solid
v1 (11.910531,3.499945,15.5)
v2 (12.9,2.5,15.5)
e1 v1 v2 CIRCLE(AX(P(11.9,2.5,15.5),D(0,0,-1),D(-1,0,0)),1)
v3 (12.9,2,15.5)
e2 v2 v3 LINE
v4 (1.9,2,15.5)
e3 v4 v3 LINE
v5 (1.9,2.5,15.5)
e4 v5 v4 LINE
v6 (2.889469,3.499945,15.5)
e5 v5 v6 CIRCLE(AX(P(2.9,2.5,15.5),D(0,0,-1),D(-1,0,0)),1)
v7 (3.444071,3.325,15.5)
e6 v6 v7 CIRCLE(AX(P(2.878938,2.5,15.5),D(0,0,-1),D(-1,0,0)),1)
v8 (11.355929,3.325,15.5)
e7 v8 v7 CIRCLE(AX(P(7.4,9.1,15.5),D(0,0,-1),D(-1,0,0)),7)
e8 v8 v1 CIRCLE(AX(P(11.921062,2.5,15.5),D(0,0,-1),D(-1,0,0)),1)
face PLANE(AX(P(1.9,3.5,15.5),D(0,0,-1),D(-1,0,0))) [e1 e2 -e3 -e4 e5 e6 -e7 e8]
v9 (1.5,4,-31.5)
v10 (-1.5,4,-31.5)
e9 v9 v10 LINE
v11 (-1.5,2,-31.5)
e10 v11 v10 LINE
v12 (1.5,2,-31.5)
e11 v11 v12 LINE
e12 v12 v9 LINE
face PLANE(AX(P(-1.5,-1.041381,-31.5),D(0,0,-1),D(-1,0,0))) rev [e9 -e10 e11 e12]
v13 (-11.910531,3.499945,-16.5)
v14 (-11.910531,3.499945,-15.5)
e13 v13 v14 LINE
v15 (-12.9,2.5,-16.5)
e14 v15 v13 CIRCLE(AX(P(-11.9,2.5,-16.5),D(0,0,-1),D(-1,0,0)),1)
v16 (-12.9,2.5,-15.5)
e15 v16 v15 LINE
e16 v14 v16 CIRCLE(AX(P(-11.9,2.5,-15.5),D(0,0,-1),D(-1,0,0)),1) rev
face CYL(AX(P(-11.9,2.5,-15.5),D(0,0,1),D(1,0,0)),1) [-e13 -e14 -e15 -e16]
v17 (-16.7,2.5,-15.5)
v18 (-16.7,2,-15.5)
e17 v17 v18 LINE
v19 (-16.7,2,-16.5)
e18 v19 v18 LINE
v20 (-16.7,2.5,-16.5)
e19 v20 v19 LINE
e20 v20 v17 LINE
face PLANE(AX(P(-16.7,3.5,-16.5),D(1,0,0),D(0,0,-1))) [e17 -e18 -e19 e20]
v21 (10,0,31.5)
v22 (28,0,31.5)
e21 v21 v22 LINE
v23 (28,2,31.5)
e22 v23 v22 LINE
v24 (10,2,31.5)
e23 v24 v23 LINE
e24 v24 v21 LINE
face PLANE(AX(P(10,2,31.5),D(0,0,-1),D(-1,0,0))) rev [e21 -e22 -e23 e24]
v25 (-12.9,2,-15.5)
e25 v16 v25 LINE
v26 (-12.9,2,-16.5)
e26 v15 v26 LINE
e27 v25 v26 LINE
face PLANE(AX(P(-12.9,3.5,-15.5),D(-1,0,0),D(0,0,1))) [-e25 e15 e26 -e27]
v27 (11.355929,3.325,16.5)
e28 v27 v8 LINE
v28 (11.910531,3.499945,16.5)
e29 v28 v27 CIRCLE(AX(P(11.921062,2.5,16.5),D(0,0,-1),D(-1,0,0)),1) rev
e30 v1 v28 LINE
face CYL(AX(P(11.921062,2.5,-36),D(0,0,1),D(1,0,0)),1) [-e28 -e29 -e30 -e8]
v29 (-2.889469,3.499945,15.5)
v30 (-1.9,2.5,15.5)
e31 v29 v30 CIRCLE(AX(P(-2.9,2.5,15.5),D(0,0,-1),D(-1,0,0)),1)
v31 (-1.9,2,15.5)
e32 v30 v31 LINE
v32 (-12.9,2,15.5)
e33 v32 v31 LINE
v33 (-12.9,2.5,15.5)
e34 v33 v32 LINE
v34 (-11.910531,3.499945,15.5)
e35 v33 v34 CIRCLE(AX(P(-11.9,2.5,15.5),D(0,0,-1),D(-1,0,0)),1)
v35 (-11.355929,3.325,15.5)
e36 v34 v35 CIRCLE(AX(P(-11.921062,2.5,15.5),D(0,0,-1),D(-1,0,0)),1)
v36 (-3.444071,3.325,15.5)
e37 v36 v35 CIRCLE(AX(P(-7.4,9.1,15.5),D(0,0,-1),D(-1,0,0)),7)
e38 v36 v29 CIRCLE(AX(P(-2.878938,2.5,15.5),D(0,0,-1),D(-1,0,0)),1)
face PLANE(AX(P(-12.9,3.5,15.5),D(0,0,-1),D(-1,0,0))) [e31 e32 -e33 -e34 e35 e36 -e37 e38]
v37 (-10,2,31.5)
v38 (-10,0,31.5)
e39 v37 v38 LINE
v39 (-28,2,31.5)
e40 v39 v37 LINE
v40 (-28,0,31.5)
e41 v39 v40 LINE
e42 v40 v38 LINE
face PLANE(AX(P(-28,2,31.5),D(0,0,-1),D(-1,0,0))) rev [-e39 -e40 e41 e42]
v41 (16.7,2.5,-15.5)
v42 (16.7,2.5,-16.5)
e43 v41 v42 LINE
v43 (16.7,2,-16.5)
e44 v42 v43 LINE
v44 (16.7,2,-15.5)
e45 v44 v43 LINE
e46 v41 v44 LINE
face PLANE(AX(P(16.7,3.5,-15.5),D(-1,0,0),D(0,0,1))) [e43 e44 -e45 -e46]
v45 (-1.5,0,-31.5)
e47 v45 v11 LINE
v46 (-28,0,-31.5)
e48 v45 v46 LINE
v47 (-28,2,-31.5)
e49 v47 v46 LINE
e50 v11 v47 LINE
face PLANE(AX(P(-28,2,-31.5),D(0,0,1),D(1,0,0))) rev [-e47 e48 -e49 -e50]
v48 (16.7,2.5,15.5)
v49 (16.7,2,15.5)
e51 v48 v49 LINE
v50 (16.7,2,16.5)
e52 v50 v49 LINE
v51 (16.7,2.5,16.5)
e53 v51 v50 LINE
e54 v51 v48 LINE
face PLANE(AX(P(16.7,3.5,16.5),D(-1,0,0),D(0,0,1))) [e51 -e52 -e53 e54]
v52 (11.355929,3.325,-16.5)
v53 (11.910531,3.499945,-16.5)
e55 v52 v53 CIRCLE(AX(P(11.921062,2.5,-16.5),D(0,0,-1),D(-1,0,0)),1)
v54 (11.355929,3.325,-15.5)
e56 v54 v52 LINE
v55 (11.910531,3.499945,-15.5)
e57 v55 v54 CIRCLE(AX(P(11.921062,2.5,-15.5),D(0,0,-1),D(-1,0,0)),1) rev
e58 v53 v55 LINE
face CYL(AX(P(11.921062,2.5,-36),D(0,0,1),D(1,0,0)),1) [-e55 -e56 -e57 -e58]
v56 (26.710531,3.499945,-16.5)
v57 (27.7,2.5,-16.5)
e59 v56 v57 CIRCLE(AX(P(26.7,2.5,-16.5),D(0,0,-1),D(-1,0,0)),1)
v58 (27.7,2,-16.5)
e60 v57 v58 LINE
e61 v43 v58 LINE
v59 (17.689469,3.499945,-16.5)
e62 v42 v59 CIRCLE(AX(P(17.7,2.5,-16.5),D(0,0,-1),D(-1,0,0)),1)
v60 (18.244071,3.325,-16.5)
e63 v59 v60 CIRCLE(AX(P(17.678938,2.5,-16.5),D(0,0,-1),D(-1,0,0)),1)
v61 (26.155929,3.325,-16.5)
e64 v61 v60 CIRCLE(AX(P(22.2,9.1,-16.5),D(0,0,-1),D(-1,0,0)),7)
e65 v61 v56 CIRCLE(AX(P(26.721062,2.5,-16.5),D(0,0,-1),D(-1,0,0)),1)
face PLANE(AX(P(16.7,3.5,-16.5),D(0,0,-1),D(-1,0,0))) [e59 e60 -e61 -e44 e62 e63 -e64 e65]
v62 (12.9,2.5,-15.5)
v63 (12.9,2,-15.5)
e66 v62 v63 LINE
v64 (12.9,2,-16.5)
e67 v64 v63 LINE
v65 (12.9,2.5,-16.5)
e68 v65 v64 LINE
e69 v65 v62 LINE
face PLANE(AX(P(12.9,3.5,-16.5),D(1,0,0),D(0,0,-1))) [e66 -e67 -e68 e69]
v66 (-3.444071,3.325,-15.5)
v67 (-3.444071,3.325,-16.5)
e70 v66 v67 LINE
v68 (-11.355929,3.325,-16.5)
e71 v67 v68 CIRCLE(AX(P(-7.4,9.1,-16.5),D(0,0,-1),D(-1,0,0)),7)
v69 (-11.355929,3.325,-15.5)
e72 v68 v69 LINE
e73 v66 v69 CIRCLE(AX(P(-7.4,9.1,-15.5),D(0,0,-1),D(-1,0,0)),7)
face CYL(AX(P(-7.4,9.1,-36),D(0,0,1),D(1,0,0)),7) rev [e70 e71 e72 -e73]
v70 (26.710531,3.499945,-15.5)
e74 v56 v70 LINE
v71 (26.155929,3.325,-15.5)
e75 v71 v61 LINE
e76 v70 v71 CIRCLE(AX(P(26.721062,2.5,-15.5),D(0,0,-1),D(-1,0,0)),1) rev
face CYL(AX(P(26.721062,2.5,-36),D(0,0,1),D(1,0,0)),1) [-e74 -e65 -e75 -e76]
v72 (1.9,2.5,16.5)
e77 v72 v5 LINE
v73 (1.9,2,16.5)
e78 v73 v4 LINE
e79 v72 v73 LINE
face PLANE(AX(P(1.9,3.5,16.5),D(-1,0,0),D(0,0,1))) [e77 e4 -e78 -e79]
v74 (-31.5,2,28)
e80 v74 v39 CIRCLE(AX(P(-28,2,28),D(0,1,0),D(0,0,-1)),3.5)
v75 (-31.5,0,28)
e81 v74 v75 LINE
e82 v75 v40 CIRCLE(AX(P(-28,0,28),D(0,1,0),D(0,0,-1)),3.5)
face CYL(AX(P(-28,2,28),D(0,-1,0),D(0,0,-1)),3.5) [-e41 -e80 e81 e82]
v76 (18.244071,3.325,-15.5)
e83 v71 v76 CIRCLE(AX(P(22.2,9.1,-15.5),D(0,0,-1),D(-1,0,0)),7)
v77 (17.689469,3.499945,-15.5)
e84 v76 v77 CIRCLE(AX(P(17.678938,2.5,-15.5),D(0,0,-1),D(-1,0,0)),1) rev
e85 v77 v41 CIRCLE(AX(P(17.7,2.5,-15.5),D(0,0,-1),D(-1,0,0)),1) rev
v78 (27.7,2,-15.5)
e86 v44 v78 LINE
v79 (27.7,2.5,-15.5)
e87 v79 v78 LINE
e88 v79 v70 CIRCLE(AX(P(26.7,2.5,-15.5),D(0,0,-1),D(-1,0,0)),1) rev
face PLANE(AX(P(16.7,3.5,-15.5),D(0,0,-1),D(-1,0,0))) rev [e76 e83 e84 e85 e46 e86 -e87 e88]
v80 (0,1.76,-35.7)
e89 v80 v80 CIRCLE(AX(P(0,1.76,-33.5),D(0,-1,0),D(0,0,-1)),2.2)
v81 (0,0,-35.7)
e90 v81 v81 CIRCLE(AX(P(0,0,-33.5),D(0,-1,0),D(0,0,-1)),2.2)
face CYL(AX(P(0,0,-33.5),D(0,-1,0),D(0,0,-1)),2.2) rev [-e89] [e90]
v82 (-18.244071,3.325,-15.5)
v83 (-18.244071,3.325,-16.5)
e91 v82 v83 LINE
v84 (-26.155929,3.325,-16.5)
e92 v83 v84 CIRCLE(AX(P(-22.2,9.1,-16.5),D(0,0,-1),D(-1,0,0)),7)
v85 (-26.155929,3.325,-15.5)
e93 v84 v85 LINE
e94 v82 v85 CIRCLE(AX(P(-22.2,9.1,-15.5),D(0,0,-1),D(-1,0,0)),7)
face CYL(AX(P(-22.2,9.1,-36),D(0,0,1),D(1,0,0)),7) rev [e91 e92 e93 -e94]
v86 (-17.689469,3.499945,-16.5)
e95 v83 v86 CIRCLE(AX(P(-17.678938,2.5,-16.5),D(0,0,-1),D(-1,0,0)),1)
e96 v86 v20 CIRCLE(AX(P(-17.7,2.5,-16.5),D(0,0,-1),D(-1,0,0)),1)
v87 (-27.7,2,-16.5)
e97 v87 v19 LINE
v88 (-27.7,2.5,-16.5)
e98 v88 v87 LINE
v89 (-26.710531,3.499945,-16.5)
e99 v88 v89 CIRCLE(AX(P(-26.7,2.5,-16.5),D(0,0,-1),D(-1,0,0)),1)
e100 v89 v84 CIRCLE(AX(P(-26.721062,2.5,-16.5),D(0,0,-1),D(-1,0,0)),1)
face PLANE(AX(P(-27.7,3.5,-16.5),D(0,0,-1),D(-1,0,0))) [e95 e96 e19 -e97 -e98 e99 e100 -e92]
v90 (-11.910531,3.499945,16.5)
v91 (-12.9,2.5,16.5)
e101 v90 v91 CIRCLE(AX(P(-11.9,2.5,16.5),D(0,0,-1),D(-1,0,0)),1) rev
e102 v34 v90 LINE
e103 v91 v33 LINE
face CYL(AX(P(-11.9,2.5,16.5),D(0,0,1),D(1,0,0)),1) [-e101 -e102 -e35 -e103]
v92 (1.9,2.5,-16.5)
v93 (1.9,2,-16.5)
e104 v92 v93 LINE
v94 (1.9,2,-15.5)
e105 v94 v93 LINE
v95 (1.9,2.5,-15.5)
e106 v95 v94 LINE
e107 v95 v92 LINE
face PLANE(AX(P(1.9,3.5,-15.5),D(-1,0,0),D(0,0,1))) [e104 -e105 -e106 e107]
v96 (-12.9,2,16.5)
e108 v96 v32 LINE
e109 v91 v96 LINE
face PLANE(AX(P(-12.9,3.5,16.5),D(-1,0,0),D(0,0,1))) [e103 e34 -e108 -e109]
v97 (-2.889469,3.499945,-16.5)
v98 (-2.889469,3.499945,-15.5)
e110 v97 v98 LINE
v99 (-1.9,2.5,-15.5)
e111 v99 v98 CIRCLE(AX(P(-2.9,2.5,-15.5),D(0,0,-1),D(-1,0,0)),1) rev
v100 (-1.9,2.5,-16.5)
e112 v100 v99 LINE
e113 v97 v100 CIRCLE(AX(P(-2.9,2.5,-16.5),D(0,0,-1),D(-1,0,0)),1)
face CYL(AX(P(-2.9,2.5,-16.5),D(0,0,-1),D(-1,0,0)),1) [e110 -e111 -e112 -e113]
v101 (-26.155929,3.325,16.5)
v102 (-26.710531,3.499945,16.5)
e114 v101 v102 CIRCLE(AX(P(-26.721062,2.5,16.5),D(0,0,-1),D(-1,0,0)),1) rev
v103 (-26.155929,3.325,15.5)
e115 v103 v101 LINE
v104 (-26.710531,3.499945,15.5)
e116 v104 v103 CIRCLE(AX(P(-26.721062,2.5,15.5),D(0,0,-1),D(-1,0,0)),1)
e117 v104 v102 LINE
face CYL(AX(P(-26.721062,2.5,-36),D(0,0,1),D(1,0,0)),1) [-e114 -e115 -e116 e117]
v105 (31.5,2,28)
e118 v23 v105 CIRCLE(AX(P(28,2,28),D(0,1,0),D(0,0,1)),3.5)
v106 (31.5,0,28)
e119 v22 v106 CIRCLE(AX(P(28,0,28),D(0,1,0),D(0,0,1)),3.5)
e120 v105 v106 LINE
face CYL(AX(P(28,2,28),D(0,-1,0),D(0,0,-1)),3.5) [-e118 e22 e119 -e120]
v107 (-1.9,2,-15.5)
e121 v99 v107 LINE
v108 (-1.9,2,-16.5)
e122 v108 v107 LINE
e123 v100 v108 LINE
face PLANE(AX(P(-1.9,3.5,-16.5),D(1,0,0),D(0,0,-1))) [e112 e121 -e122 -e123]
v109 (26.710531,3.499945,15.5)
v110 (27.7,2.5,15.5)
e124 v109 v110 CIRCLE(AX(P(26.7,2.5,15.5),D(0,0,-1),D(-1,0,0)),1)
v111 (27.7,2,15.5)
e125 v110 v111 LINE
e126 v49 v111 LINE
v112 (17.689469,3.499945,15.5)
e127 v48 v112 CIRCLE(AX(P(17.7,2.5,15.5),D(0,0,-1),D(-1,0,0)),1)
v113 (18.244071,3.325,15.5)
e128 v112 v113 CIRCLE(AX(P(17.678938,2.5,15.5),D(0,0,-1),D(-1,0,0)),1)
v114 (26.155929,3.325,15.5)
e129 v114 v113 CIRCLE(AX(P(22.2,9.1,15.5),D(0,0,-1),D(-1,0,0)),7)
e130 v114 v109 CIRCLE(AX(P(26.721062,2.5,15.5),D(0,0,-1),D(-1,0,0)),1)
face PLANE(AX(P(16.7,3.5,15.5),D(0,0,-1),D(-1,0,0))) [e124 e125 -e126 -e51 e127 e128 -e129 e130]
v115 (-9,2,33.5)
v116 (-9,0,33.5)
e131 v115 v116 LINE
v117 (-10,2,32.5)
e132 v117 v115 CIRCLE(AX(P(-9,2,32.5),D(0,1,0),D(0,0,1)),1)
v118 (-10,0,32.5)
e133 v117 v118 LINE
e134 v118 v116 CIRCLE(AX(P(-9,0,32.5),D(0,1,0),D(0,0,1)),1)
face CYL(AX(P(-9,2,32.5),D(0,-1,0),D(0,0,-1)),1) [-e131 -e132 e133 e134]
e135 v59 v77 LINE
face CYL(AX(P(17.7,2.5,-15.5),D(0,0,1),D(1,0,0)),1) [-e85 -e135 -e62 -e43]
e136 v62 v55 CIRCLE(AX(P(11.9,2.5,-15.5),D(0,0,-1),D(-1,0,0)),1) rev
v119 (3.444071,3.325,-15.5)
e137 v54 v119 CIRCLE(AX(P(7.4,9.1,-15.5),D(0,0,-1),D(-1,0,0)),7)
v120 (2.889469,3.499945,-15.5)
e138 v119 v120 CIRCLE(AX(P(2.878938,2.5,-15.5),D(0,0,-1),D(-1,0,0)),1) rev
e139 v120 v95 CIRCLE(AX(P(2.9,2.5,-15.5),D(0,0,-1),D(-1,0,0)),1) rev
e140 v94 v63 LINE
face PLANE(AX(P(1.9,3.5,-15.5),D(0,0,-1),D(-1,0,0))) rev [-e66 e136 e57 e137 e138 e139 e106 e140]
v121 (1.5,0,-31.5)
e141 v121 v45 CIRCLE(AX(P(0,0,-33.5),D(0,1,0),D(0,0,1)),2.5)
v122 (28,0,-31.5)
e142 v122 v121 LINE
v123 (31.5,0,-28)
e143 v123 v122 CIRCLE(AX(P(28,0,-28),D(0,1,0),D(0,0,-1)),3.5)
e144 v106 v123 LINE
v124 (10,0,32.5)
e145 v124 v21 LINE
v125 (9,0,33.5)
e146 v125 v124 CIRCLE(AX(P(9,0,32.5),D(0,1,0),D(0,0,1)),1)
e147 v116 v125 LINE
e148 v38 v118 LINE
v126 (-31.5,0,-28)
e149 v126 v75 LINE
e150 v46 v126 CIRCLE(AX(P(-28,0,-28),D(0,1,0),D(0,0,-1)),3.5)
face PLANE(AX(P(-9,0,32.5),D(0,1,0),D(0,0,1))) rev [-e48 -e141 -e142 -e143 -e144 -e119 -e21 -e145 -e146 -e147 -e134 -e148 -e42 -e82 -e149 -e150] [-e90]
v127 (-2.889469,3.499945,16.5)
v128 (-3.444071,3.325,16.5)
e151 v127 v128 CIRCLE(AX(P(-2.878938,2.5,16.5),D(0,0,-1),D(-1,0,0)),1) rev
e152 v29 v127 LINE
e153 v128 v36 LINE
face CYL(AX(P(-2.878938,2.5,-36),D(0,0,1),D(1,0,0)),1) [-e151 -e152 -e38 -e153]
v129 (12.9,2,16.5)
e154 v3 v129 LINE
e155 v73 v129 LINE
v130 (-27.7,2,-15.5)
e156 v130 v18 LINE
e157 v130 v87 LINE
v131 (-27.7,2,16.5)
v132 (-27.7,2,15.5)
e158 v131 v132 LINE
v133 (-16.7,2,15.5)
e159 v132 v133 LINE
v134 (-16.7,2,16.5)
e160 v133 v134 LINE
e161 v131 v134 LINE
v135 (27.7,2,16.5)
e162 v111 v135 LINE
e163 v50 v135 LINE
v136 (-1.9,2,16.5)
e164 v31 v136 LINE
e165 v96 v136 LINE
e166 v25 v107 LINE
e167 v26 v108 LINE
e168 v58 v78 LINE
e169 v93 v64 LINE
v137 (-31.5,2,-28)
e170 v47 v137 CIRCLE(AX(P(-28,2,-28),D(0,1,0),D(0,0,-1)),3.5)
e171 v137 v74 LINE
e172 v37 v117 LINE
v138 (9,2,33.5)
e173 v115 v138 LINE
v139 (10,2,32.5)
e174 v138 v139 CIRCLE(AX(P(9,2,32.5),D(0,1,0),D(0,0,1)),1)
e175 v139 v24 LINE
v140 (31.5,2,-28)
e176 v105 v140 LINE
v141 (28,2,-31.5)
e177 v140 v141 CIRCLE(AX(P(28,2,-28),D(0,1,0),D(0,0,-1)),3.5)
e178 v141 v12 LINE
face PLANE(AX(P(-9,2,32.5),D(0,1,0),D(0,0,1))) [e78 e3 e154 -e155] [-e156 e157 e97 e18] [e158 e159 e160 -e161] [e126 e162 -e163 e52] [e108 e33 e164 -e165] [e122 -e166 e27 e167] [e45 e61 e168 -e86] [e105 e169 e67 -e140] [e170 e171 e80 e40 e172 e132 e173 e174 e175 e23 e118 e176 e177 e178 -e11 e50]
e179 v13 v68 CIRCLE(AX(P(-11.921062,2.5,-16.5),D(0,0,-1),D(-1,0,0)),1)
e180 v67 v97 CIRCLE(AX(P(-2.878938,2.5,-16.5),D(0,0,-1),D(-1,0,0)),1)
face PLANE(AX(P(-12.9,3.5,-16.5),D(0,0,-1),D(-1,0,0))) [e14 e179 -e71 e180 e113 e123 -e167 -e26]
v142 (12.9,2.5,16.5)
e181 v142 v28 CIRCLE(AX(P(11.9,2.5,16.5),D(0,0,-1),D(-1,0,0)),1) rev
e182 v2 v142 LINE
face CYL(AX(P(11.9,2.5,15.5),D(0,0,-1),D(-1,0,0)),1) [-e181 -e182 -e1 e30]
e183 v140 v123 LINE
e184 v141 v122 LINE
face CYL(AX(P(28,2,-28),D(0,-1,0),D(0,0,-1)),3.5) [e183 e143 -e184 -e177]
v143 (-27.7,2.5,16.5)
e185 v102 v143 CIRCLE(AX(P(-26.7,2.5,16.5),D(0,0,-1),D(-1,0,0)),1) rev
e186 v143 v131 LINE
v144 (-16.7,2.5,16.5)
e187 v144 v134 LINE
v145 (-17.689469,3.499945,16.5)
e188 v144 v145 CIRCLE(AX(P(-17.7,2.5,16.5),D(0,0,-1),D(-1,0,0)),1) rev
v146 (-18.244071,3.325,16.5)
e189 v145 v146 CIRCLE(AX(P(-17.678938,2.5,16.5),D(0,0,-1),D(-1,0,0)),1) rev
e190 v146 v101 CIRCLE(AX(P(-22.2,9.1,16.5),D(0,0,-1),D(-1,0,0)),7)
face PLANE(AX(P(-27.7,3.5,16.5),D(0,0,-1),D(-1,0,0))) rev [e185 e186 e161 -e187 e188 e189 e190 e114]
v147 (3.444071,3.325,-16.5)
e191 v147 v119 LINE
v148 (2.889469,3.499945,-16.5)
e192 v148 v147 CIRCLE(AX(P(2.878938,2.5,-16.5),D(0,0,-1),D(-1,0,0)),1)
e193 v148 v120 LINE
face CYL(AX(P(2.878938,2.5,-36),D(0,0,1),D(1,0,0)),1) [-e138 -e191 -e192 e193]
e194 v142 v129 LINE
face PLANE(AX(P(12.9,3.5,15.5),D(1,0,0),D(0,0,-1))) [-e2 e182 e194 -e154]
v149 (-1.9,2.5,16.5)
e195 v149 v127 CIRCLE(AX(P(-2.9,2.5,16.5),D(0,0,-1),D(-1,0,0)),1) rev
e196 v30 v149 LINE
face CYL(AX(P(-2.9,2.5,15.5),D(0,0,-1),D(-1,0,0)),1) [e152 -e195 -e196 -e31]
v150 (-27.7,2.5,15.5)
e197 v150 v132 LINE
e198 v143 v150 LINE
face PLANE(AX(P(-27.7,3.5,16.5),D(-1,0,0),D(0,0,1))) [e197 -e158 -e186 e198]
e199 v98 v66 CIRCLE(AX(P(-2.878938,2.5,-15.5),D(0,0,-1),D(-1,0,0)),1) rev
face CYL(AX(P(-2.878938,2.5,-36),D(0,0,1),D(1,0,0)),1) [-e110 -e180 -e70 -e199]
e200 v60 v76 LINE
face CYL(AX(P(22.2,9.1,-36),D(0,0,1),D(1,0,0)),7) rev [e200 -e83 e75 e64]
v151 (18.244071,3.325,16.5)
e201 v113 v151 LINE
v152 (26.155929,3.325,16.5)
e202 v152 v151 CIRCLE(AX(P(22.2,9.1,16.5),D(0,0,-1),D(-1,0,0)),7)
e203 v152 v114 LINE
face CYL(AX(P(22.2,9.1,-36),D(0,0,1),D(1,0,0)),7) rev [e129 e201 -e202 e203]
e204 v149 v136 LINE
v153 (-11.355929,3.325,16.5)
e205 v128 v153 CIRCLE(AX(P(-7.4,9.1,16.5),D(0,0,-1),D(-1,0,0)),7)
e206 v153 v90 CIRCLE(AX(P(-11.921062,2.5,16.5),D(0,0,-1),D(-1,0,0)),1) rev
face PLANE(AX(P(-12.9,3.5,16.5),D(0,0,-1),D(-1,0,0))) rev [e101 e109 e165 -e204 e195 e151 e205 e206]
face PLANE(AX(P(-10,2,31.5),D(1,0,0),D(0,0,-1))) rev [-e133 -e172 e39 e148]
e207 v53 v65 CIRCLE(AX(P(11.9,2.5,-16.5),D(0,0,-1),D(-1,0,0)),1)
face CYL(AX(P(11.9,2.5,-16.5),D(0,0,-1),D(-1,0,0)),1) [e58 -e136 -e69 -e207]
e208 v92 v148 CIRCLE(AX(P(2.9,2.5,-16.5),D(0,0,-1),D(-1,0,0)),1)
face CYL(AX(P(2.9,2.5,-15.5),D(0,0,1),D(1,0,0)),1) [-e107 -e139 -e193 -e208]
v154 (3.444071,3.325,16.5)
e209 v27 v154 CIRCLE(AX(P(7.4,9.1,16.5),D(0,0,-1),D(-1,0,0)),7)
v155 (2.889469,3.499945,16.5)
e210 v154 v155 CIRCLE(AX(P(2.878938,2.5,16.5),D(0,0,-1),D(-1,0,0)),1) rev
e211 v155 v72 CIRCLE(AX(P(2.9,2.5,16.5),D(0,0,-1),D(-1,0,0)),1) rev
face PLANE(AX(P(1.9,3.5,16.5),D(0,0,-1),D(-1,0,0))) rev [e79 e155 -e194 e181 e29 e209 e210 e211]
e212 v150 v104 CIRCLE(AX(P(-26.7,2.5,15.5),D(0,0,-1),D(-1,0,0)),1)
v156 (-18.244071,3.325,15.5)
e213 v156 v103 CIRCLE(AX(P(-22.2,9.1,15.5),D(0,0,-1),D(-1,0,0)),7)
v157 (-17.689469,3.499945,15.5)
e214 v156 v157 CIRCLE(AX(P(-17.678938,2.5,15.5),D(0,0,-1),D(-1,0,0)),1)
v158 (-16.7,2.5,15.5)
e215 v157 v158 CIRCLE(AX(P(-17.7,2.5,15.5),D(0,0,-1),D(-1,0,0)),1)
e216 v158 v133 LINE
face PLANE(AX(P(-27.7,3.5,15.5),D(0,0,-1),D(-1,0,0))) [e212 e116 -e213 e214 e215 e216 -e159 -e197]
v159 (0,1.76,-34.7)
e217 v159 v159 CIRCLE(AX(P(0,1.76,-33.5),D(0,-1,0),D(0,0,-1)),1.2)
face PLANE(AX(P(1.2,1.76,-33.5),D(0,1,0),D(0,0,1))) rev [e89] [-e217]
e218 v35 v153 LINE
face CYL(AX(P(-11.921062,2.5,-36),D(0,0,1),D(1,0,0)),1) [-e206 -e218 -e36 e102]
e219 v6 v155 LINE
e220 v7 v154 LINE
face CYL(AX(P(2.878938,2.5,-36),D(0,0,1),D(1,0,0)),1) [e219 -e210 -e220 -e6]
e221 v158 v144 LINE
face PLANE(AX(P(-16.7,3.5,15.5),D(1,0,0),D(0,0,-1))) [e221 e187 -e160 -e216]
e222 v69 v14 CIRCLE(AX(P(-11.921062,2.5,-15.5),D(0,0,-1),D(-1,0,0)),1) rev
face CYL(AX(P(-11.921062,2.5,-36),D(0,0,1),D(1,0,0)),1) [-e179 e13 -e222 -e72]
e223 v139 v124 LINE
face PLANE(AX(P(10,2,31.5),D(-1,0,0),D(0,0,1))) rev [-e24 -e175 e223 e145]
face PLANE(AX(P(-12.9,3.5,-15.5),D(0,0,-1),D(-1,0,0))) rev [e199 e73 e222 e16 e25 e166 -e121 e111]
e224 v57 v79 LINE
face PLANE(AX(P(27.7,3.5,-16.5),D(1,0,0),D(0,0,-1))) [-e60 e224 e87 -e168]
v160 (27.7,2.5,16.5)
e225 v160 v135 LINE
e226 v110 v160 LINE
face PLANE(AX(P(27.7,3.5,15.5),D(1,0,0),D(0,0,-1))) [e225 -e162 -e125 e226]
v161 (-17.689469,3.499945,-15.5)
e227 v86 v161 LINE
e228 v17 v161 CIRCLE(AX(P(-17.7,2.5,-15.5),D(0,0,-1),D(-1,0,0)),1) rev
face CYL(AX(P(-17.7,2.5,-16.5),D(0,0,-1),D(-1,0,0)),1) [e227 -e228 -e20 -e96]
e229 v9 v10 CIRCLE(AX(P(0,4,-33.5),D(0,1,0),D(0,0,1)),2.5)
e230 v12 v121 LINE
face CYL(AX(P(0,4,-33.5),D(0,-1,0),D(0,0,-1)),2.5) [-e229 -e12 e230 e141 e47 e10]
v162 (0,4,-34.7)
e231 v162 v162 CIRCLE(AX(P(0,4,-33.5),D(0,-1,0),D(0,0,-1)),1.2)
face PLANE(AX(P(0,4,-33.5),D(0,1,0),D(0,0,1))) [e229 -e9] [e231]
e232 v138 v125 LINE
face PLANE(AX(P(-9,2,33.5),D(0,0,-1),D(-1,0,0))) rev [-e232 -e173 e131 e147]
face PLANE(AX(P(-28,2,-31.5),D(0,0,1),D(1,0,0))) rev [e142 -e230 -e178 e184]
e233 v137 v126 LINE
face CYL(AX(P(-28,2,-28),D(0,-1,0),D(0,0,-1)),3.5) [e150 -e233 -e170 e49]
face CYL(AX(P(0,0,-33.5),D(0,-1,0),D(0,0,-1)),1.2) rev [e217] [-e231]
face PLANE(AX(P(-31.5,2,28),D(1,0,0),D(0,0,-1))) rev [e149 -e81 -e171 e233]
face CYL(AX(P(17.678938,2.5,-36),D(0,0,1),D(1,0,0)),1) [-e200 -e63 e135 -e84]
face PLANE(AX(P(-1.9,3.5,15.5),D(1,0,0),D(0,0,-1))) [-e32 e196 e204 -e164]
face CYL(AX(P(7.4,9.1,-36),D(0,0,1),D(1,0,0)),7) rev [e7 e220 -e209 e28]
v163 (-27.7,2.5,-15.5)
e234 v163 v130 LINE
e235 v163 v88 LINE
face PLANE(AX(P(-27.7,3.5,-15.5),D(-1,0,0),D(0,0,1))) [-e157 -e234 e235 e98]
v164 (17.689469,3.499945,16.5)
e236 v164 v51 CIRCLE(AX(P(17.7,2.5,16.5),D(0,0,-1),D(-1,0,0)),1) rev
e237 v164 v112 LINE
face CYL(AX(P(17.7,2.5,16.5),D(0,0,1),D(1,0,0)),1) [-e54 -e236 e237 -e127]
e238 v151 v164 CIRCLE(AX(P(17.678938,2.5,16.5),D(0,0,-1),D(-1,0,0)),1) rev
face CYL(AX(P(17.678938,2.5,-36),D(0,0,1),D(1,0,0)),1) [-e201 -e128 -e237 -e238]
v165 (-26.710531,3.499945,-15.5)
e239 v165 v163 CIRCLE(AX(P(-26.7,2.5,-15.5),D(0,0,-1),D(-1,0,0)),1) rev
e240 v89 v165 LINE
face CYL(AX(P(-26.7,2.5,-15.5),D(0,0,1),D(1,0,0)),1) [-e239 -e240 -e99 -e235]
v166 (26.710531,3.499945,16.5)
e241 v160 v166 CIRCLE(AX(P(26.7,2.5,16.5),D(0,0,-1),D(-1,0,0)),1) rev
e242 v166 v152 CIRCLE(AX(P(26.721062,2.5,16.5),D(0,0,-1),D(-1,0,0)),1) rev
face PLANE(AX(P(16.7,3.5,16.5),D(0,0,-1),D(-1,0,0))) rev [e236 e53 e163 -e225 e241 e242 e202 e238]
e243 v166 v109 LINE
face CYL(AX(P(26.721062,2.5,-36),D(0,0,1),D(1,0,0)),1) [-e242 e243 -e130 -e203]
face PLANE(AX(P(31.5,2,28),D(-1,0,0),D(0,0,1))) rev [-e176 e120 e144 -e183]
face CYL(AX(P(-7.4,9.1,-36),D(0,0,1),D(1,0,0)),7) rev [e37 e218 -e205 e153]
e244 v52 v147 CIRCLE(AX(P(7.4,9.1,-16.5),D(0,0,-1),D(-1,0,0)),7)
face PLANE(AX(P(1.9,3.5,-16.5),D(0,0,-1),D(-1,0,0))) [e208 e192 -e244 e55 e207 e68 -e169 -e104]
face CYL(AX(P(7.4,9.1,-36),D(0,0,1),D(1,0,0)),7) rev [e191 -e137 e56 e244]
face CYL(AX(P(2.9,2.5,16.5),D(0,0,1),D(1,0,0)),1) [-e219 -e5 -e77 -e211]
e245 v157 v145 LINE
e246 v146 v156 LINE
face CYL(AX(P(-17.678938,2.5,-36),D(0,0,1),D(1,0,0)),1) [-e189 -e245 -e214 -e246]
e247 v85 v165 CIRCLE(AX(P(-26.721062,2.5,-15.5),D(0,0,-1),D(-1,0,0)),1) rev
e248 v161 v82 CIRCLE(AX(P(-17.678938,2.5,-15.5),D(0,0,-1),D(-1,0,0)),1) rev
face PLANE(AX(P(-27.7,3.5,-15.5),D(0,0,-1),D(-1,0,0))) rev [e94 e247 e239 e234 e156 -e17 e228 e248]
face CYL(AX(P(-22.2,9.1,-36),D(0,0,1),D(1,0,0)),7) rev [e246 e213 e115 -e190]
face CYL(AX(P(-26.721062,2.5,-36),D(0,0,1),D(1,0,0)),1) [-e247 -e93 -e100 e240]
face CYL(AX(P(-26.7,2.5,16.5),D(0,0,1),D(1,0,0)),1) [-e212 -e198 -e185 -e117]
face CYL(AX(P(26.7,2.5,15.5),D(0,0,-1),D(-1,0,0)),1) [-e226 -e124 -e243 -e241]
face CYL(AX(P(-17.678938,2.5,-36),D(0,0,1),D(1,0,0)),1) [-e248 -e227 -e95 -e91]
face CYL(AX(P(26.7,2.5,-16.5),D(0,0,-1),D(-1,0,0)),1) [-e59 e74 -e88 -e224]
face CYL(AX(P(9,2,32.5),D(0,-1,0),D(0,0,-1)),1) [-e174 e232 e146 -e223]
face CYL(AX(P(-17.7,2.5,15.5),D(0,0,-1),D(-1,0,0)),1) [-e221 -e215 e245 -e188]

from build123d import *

# Parameters (mm, degrees)
BOSS_EXTRUDE1_DEPTH                     = 2
SKETCH2_R                               = 2.5
BOSS_EXTRUDE3_DEPTH                     = 4
SKETCH5_W                               = 11
SKETCH5_H                               = 1
EXTRUDE_THIN2_DEPTH                     = 1.5
CUT_EXTRUDE2_DEPTH                      = 49.002604096
CUT_EXTRUDE2_DEPTH_BACK                 = 49.002604096
SKETCH7_R                               = 7
FILLET2_R                               = 1
CUT_EXTRUDE3_START                      = -2
CUT_EXTRUDE3_DEPTH                      = 2
CBORE_FOR_M2_HEX_HEAD_BOLT2_D           = 2.4
CBORE_FOR_M2_HEX_HEAD_BOLT2_CBORE_D     = 4.4
CBORE_FOR_M2_HEX_HEAD_BOLT2_CBORE_DEPTH = 1.76


with BuildPart() as part:
    # Sketch1 → Boss-Extrude1 (new body)
    with BuildSketch(Plane(origin=(0, 0, 0), x_dir=(1, 0, 0), z_dir=(0, 1, 0))):
        with BuildLine():
            Line((10, -31.5), (28, -31.5))
            ThreePointArc((28, -31.5), (30.474873734, -30.474873734), (31.5, -28))
            Line((31.5, -28), (31.5, 28))
            ThreePointArc((31.5, 28), (30.474873734, 30.474873734), (28, 31.5))
            Line((28, 31.5), (-28, 31.5))
            ThreePointArc((-28, 31.5), (-30.474873734, 30.474873734), (-31.5, 28))
            Line((-31.5, 28), (-31.5, -28))
            ThreePointArc((-31.5, -28), (-30.474873734, -30.474873734), (-28, -31.5))
            Line((-28, -31.5), (-10, -31.5))
            Line((-10, -31.5), (-10, -32.5))
            ThreePointArc((-10, -32.5), (-9.707106781, -33.207106781), (-9, -33.5))
            Line((-9, -33.5), (9, -33.5))
            ThreePointArc((9, -33.5), (9.707106781, -33.207106781), (10, -32.5))
            Line((10, -32.5), (10, -31.5))
        make_face()
    extrude(amount=BOSS_EXTRUDE1_DEPTH)

    # Sketch2 → Boss-Extrude3 (add)
    with BuildSketch(Plane(origin=(0, 0, 0), x_dir=(1, 0, 0), z_dir=(0, 1, 0))):
        with Locations(Location((0, 33.5, 0), (0, 0, 233.130102354))):
            Circle(SKETCH2_R)
    extrude(amount=BOSS_EXTRUDE3_DEPTH)

    # Sketch5 → Extrude-Thin2 (add)
    with BuildSketch(Plane(origin=(0, 2, 0), x_dir=(1, 0, 0), z_dir=(0, 1, 0))):
        with Locations((-22.2, 16)):
            Rectangle(SKETCH5_W, SKETCH5_H)
        with Locations((-22.2, -16)):
            Rectangle(SKETCH5_W, SKETCH5_H)
        with Locations((-7.4, -16)):
            Rectangle(SKETCH5_W, SKETCH5_H)
        with Locations((-7.4, 16)):
            Rectangle(SKETCH5_W, SKETCH5_H)
        with Locations((7.4, -16)):
            Rectangle(SKETCH5_W, SKETCH5_H)
        with Locations((7.4, 16)):
            Rectangle(SKETCH5_W, SKETCH5_H)
        with Locations((22.2, -16)):
            Rectangle(SKETCH5_W, SKETCH5_H)
        with Locations((22.2, 16)):
            Rectangle(SKETCH5_W, SKETCH5_H)
    extrude(amount=EXTRUDE_THIN2_DEPTH)

    # Sketch7 → Cut-Extrude2 (cut, two sides: drawn at the far end of the back side and taken through both)
    with BuildSketch(Plane.XY.offset(-CUT_EXTRUDE2_DEPTH_BACK)):
        with Locations((-22.2, 9.1)):
            Circle(SKETCH7_R)
        with Locations((-7.4, 9.1)):
            Circle(SKETCH7_R)
        with Locations((7.4, 9.1)):
            Circle(SKETCH7_R)
        with Locations((22.2, 9.1)):
            Circle(SKETCH7_R)
    extrude(amount=CUT_EXTRUDE2_DEPTH + CUT_EXTRUDE2_DEPTH_BACK, mode=Mode.SUBTRACT)

    # Fillet2
    # the kernel refuses this fillet: 1 mm, written as the material it takes off along each edge
    with BuildSketch(Plane(origin=(-16.7, 3.5, 19), x_dir=(0, -1, 0), z_dir=(0, 0, -1)), Plane(origin=(-27.7, 3.5, 13), x_dir=(0, -1, 0), z_dir=(0, 0, 1)), Plane(origin=(-12.9, 3.5, 13), x_dir=(0, -1, 0), z_dir=(0, 0, 1)), Plane(origin=(-1.9, 3.5, 19), x_dir=(0, -1, 0), z_dir=(0, 0, -1)), Plane(origin=(1.9, 3.5, 13), x_dir=(0, -1, 0), z_dir=(0, 0, 1)), Plane(origin=(12.9, 3.5, 19), x_dir=(0, -1, 0), z_dir=(0, 0, -1)), Plane(origin=(16.7, 3.5, 13), x_dir=(0, -1, 0), z_dir=(0, 0, 1)), Plane(origin=(27.7, 3.5, 19), x_dir=(0, -1, 0), z_dir=(0, 0, -1)), Plane(origin=(16.7, 3.5, -19), x_dir=(0, -1, 0), z_dir=(0, 0, 1)), Plane(origin=(27.7, 3.5, -13), x_dir=(0, -1, 0), z_dir=(0, 0, -1)), Plane(origin=(12.9, 3.5, -13), x_dir=(0, -1, 0), z_dir=(0, 0, -1)), Plane(origin=(1.9, 3.5, -19), x_dir=(0, -1, 0), z_dir=(0, 0, 1)), Plane(origin=(-1.9, 3.5, -13), x_dir=(0, -1, 0), z_dir=(0, 0, -1)), Plane(origin=(-12.9, 3.5, -19), x_dir=(0, -1, 0), z_dir=(0, 0, 1)), Plane(origin=(-16.7, 3.5, -13), x_dir=(0, -1, 0), z_dir=(0, 0, -1)), Plane(origin=(-27.7, 3.5, -19), x_dir=(0, -1, 0), z_dir=(0, 0, 1))) as fillet2_piece_1:
        with BuildLine():
            CenterArc((FILLET2_R, FILLET2_R), FILLET2_R, 180, 90)
            Line((0, FILLET2_R), (0, 0))
            Line((0, 0), (FILLET2_R, 0))
        make_face()
    extrude(amount=6, mode=Mode.SUBTRACT)
    with BuildSketch(Plane(origin=(-18, 3.5, 17.302654555), x_dir=(1, 0, 0), z_dir=(0, 0, -1)), Plane(origin=(-3.2, 3.5, 17.302654555), x_dir=(1, 0, 0), z_dir=(0, 0, -1)), Plane(origin=(11.6, 3.5, 17.302654555), x_dir=(1, 0, 0), z_dir=(0, 0, -1)), Plane(origin=(26.4, 3.5, 17.302654555), x_dir=(1, 0, 0), z_dir=(0, 0, -1))) as fillet2_piece_2:
        with BuildLine():
            CenterArc((0.321061822, 1), FILLET2_R, 235.58849133, 34.41150867)
            ThreePointArc((-0.244070906, 0.175), (-0.121096827, 0.088809093), (0, 0))
            Line((0, 0), (0.321061822, 0))
        make_face()
    extrude(amount=2.605309111, mode=Mode.SUBTRACT)
    with BuildSketch(Plane(origin=(-26.4, 3.5, 17.302654555), x_dir=(0.8126870133502501, -0.5827004533479019, 0), z_dir=(0, 0, -1)), Plane(origin=(-11.6, 3.5, 17.302654555), x_dir=(0.8126870133502461, -0.5827004533479074, 0), z_dir=(0, 0, -1)), Plane(origin=(3.2, 3.5, 17.302654555), x_dir=(0.8126870133502461, -0.5827004533479074, 0), z_dir=(0, 0, -1)), Plane(origin=(18, 3.5, 17.302654555), x_dir=(0.8126870133502501, -0.5827004533479019, 0), z_dir=(0, 0, -1))) as fillet2_piece_3:
        with BuildLine():
            CenterArc((0.32177768, 0.999769883), FILLET2_R, 234.359296842, 34.41150867)
            Line((-0.260922773, 0.187082869), (0, 0))
            ThreePointArc((0, 0), (0.150162917, 0.001610821), (0.300325835, 0))
        make_face()
    extrude(amount=2.605309111, mode=Mode.SUBTRACT)
    with BuildSketch(Plane(origin=(18, 3.5, -17.302654555), x_dir=(0.8126870133502501, -0.5827004533479019, 0), z_dir=(0, 0, 1)), Plane(origin=(3.2, 3.5, -17.302654555), x_dir=(0.8126870133502461, -0.5827004533479074, 0), z_dir=(0, 0, 1)), Plane(origin=(-11.6, 3.5, -17.302654555), x_dir=(0.8126870133502461, -0.5827004533479074, 0), z_dir=(0, 0, 1)), Plane(origin=(-26.4, 3.5, -17.302654555), x_dir=(0.8126870133502501, -0.5827004533479019, 0), z_dir=(0, 0, 1))) as fillet2_piece_4:
        with BuildLine():
            CenterArc((0.32177768, -0.999769883), FILLET2_R, 91.229194488, 34.41150867)
            Line((-0.260922773, -0.187082869), (0, 0))
            ThreePointArc((0, 0), (0.150162917, -0.001610821), (0.300325835, 0))
        make_face()
    extrude(amount=2.605309111, mode=Mode.SUBTRACT)
    with BuildSketch(Plane(origin=(26.4, 3.5, -17.302654555), x_dir=(1, 0, 0), z_dir=(0, 0, 1)), Plane(origin=(11.6, 3.5, -17.302654555), x_dir=(1, 0, 0), z_dir=(0, 0, 1)), Plane(origin=(-3.2, 3.5, -17.302654555), x_dir=(1, 0, 0), z_dir=(0, 0, 1)), Plane(origin=(-18, 3.5, -17.302654555), x_dir=(1, 0, 0), z_dir=(0, 0, 1))) as fillet2_piece_5:
        with BuildLine():
            CenterArc((0.321061822, -1), FILLET2_R, 90, 34.41150867)
            ThreePointArc((-0.244070906, -0.175), (-0.121096827, -0.088809093), (0, 0))
            Line((0, 0), (0.321061822, 0))
        make_face()
    extrude(amount=2.605309111, mode=Mode.SUBTRACT)

    # Sketch8 → Cut-Extrude3 (cut)
    with BuildSketch(Plane(origin=(0, 4, 0), x_dir=(1, 0, 0), z_dir=(0, 1, 0)).offset(CUT_EXTRUDE3_START)):
        with BuildLine():
            Line((-1.5, 31.5), (1.5, 31.5))
            ThreePointArc((1.5, 31.5), (0, 31), (-1.5, 31.5))
        make_face()
    extrude(amount=CUT_EXTRUDE3_DEPTH, mode=Mode.SUBTRACT)

    # CBORE for M2 Hex Head Bolt2 (through all)
    with Locations(Plane(origin=(0, 0, 0), x_dir=(-1, 0, 0), z_dir=(0, -1, 0))):
        with Locations((0, 33.5)):
            CounterBoreHole(CBORE_FOR_M2_HEX_HEAD_BOLT2_D / 2, CBORE_FOR_M2_HEX_HEAD_BOLT2_CBORE_D / 2, CBORE_FOR_M2_HEX_HEAD_BOLT2_CBORE_DEPTH)


solid = part.part
